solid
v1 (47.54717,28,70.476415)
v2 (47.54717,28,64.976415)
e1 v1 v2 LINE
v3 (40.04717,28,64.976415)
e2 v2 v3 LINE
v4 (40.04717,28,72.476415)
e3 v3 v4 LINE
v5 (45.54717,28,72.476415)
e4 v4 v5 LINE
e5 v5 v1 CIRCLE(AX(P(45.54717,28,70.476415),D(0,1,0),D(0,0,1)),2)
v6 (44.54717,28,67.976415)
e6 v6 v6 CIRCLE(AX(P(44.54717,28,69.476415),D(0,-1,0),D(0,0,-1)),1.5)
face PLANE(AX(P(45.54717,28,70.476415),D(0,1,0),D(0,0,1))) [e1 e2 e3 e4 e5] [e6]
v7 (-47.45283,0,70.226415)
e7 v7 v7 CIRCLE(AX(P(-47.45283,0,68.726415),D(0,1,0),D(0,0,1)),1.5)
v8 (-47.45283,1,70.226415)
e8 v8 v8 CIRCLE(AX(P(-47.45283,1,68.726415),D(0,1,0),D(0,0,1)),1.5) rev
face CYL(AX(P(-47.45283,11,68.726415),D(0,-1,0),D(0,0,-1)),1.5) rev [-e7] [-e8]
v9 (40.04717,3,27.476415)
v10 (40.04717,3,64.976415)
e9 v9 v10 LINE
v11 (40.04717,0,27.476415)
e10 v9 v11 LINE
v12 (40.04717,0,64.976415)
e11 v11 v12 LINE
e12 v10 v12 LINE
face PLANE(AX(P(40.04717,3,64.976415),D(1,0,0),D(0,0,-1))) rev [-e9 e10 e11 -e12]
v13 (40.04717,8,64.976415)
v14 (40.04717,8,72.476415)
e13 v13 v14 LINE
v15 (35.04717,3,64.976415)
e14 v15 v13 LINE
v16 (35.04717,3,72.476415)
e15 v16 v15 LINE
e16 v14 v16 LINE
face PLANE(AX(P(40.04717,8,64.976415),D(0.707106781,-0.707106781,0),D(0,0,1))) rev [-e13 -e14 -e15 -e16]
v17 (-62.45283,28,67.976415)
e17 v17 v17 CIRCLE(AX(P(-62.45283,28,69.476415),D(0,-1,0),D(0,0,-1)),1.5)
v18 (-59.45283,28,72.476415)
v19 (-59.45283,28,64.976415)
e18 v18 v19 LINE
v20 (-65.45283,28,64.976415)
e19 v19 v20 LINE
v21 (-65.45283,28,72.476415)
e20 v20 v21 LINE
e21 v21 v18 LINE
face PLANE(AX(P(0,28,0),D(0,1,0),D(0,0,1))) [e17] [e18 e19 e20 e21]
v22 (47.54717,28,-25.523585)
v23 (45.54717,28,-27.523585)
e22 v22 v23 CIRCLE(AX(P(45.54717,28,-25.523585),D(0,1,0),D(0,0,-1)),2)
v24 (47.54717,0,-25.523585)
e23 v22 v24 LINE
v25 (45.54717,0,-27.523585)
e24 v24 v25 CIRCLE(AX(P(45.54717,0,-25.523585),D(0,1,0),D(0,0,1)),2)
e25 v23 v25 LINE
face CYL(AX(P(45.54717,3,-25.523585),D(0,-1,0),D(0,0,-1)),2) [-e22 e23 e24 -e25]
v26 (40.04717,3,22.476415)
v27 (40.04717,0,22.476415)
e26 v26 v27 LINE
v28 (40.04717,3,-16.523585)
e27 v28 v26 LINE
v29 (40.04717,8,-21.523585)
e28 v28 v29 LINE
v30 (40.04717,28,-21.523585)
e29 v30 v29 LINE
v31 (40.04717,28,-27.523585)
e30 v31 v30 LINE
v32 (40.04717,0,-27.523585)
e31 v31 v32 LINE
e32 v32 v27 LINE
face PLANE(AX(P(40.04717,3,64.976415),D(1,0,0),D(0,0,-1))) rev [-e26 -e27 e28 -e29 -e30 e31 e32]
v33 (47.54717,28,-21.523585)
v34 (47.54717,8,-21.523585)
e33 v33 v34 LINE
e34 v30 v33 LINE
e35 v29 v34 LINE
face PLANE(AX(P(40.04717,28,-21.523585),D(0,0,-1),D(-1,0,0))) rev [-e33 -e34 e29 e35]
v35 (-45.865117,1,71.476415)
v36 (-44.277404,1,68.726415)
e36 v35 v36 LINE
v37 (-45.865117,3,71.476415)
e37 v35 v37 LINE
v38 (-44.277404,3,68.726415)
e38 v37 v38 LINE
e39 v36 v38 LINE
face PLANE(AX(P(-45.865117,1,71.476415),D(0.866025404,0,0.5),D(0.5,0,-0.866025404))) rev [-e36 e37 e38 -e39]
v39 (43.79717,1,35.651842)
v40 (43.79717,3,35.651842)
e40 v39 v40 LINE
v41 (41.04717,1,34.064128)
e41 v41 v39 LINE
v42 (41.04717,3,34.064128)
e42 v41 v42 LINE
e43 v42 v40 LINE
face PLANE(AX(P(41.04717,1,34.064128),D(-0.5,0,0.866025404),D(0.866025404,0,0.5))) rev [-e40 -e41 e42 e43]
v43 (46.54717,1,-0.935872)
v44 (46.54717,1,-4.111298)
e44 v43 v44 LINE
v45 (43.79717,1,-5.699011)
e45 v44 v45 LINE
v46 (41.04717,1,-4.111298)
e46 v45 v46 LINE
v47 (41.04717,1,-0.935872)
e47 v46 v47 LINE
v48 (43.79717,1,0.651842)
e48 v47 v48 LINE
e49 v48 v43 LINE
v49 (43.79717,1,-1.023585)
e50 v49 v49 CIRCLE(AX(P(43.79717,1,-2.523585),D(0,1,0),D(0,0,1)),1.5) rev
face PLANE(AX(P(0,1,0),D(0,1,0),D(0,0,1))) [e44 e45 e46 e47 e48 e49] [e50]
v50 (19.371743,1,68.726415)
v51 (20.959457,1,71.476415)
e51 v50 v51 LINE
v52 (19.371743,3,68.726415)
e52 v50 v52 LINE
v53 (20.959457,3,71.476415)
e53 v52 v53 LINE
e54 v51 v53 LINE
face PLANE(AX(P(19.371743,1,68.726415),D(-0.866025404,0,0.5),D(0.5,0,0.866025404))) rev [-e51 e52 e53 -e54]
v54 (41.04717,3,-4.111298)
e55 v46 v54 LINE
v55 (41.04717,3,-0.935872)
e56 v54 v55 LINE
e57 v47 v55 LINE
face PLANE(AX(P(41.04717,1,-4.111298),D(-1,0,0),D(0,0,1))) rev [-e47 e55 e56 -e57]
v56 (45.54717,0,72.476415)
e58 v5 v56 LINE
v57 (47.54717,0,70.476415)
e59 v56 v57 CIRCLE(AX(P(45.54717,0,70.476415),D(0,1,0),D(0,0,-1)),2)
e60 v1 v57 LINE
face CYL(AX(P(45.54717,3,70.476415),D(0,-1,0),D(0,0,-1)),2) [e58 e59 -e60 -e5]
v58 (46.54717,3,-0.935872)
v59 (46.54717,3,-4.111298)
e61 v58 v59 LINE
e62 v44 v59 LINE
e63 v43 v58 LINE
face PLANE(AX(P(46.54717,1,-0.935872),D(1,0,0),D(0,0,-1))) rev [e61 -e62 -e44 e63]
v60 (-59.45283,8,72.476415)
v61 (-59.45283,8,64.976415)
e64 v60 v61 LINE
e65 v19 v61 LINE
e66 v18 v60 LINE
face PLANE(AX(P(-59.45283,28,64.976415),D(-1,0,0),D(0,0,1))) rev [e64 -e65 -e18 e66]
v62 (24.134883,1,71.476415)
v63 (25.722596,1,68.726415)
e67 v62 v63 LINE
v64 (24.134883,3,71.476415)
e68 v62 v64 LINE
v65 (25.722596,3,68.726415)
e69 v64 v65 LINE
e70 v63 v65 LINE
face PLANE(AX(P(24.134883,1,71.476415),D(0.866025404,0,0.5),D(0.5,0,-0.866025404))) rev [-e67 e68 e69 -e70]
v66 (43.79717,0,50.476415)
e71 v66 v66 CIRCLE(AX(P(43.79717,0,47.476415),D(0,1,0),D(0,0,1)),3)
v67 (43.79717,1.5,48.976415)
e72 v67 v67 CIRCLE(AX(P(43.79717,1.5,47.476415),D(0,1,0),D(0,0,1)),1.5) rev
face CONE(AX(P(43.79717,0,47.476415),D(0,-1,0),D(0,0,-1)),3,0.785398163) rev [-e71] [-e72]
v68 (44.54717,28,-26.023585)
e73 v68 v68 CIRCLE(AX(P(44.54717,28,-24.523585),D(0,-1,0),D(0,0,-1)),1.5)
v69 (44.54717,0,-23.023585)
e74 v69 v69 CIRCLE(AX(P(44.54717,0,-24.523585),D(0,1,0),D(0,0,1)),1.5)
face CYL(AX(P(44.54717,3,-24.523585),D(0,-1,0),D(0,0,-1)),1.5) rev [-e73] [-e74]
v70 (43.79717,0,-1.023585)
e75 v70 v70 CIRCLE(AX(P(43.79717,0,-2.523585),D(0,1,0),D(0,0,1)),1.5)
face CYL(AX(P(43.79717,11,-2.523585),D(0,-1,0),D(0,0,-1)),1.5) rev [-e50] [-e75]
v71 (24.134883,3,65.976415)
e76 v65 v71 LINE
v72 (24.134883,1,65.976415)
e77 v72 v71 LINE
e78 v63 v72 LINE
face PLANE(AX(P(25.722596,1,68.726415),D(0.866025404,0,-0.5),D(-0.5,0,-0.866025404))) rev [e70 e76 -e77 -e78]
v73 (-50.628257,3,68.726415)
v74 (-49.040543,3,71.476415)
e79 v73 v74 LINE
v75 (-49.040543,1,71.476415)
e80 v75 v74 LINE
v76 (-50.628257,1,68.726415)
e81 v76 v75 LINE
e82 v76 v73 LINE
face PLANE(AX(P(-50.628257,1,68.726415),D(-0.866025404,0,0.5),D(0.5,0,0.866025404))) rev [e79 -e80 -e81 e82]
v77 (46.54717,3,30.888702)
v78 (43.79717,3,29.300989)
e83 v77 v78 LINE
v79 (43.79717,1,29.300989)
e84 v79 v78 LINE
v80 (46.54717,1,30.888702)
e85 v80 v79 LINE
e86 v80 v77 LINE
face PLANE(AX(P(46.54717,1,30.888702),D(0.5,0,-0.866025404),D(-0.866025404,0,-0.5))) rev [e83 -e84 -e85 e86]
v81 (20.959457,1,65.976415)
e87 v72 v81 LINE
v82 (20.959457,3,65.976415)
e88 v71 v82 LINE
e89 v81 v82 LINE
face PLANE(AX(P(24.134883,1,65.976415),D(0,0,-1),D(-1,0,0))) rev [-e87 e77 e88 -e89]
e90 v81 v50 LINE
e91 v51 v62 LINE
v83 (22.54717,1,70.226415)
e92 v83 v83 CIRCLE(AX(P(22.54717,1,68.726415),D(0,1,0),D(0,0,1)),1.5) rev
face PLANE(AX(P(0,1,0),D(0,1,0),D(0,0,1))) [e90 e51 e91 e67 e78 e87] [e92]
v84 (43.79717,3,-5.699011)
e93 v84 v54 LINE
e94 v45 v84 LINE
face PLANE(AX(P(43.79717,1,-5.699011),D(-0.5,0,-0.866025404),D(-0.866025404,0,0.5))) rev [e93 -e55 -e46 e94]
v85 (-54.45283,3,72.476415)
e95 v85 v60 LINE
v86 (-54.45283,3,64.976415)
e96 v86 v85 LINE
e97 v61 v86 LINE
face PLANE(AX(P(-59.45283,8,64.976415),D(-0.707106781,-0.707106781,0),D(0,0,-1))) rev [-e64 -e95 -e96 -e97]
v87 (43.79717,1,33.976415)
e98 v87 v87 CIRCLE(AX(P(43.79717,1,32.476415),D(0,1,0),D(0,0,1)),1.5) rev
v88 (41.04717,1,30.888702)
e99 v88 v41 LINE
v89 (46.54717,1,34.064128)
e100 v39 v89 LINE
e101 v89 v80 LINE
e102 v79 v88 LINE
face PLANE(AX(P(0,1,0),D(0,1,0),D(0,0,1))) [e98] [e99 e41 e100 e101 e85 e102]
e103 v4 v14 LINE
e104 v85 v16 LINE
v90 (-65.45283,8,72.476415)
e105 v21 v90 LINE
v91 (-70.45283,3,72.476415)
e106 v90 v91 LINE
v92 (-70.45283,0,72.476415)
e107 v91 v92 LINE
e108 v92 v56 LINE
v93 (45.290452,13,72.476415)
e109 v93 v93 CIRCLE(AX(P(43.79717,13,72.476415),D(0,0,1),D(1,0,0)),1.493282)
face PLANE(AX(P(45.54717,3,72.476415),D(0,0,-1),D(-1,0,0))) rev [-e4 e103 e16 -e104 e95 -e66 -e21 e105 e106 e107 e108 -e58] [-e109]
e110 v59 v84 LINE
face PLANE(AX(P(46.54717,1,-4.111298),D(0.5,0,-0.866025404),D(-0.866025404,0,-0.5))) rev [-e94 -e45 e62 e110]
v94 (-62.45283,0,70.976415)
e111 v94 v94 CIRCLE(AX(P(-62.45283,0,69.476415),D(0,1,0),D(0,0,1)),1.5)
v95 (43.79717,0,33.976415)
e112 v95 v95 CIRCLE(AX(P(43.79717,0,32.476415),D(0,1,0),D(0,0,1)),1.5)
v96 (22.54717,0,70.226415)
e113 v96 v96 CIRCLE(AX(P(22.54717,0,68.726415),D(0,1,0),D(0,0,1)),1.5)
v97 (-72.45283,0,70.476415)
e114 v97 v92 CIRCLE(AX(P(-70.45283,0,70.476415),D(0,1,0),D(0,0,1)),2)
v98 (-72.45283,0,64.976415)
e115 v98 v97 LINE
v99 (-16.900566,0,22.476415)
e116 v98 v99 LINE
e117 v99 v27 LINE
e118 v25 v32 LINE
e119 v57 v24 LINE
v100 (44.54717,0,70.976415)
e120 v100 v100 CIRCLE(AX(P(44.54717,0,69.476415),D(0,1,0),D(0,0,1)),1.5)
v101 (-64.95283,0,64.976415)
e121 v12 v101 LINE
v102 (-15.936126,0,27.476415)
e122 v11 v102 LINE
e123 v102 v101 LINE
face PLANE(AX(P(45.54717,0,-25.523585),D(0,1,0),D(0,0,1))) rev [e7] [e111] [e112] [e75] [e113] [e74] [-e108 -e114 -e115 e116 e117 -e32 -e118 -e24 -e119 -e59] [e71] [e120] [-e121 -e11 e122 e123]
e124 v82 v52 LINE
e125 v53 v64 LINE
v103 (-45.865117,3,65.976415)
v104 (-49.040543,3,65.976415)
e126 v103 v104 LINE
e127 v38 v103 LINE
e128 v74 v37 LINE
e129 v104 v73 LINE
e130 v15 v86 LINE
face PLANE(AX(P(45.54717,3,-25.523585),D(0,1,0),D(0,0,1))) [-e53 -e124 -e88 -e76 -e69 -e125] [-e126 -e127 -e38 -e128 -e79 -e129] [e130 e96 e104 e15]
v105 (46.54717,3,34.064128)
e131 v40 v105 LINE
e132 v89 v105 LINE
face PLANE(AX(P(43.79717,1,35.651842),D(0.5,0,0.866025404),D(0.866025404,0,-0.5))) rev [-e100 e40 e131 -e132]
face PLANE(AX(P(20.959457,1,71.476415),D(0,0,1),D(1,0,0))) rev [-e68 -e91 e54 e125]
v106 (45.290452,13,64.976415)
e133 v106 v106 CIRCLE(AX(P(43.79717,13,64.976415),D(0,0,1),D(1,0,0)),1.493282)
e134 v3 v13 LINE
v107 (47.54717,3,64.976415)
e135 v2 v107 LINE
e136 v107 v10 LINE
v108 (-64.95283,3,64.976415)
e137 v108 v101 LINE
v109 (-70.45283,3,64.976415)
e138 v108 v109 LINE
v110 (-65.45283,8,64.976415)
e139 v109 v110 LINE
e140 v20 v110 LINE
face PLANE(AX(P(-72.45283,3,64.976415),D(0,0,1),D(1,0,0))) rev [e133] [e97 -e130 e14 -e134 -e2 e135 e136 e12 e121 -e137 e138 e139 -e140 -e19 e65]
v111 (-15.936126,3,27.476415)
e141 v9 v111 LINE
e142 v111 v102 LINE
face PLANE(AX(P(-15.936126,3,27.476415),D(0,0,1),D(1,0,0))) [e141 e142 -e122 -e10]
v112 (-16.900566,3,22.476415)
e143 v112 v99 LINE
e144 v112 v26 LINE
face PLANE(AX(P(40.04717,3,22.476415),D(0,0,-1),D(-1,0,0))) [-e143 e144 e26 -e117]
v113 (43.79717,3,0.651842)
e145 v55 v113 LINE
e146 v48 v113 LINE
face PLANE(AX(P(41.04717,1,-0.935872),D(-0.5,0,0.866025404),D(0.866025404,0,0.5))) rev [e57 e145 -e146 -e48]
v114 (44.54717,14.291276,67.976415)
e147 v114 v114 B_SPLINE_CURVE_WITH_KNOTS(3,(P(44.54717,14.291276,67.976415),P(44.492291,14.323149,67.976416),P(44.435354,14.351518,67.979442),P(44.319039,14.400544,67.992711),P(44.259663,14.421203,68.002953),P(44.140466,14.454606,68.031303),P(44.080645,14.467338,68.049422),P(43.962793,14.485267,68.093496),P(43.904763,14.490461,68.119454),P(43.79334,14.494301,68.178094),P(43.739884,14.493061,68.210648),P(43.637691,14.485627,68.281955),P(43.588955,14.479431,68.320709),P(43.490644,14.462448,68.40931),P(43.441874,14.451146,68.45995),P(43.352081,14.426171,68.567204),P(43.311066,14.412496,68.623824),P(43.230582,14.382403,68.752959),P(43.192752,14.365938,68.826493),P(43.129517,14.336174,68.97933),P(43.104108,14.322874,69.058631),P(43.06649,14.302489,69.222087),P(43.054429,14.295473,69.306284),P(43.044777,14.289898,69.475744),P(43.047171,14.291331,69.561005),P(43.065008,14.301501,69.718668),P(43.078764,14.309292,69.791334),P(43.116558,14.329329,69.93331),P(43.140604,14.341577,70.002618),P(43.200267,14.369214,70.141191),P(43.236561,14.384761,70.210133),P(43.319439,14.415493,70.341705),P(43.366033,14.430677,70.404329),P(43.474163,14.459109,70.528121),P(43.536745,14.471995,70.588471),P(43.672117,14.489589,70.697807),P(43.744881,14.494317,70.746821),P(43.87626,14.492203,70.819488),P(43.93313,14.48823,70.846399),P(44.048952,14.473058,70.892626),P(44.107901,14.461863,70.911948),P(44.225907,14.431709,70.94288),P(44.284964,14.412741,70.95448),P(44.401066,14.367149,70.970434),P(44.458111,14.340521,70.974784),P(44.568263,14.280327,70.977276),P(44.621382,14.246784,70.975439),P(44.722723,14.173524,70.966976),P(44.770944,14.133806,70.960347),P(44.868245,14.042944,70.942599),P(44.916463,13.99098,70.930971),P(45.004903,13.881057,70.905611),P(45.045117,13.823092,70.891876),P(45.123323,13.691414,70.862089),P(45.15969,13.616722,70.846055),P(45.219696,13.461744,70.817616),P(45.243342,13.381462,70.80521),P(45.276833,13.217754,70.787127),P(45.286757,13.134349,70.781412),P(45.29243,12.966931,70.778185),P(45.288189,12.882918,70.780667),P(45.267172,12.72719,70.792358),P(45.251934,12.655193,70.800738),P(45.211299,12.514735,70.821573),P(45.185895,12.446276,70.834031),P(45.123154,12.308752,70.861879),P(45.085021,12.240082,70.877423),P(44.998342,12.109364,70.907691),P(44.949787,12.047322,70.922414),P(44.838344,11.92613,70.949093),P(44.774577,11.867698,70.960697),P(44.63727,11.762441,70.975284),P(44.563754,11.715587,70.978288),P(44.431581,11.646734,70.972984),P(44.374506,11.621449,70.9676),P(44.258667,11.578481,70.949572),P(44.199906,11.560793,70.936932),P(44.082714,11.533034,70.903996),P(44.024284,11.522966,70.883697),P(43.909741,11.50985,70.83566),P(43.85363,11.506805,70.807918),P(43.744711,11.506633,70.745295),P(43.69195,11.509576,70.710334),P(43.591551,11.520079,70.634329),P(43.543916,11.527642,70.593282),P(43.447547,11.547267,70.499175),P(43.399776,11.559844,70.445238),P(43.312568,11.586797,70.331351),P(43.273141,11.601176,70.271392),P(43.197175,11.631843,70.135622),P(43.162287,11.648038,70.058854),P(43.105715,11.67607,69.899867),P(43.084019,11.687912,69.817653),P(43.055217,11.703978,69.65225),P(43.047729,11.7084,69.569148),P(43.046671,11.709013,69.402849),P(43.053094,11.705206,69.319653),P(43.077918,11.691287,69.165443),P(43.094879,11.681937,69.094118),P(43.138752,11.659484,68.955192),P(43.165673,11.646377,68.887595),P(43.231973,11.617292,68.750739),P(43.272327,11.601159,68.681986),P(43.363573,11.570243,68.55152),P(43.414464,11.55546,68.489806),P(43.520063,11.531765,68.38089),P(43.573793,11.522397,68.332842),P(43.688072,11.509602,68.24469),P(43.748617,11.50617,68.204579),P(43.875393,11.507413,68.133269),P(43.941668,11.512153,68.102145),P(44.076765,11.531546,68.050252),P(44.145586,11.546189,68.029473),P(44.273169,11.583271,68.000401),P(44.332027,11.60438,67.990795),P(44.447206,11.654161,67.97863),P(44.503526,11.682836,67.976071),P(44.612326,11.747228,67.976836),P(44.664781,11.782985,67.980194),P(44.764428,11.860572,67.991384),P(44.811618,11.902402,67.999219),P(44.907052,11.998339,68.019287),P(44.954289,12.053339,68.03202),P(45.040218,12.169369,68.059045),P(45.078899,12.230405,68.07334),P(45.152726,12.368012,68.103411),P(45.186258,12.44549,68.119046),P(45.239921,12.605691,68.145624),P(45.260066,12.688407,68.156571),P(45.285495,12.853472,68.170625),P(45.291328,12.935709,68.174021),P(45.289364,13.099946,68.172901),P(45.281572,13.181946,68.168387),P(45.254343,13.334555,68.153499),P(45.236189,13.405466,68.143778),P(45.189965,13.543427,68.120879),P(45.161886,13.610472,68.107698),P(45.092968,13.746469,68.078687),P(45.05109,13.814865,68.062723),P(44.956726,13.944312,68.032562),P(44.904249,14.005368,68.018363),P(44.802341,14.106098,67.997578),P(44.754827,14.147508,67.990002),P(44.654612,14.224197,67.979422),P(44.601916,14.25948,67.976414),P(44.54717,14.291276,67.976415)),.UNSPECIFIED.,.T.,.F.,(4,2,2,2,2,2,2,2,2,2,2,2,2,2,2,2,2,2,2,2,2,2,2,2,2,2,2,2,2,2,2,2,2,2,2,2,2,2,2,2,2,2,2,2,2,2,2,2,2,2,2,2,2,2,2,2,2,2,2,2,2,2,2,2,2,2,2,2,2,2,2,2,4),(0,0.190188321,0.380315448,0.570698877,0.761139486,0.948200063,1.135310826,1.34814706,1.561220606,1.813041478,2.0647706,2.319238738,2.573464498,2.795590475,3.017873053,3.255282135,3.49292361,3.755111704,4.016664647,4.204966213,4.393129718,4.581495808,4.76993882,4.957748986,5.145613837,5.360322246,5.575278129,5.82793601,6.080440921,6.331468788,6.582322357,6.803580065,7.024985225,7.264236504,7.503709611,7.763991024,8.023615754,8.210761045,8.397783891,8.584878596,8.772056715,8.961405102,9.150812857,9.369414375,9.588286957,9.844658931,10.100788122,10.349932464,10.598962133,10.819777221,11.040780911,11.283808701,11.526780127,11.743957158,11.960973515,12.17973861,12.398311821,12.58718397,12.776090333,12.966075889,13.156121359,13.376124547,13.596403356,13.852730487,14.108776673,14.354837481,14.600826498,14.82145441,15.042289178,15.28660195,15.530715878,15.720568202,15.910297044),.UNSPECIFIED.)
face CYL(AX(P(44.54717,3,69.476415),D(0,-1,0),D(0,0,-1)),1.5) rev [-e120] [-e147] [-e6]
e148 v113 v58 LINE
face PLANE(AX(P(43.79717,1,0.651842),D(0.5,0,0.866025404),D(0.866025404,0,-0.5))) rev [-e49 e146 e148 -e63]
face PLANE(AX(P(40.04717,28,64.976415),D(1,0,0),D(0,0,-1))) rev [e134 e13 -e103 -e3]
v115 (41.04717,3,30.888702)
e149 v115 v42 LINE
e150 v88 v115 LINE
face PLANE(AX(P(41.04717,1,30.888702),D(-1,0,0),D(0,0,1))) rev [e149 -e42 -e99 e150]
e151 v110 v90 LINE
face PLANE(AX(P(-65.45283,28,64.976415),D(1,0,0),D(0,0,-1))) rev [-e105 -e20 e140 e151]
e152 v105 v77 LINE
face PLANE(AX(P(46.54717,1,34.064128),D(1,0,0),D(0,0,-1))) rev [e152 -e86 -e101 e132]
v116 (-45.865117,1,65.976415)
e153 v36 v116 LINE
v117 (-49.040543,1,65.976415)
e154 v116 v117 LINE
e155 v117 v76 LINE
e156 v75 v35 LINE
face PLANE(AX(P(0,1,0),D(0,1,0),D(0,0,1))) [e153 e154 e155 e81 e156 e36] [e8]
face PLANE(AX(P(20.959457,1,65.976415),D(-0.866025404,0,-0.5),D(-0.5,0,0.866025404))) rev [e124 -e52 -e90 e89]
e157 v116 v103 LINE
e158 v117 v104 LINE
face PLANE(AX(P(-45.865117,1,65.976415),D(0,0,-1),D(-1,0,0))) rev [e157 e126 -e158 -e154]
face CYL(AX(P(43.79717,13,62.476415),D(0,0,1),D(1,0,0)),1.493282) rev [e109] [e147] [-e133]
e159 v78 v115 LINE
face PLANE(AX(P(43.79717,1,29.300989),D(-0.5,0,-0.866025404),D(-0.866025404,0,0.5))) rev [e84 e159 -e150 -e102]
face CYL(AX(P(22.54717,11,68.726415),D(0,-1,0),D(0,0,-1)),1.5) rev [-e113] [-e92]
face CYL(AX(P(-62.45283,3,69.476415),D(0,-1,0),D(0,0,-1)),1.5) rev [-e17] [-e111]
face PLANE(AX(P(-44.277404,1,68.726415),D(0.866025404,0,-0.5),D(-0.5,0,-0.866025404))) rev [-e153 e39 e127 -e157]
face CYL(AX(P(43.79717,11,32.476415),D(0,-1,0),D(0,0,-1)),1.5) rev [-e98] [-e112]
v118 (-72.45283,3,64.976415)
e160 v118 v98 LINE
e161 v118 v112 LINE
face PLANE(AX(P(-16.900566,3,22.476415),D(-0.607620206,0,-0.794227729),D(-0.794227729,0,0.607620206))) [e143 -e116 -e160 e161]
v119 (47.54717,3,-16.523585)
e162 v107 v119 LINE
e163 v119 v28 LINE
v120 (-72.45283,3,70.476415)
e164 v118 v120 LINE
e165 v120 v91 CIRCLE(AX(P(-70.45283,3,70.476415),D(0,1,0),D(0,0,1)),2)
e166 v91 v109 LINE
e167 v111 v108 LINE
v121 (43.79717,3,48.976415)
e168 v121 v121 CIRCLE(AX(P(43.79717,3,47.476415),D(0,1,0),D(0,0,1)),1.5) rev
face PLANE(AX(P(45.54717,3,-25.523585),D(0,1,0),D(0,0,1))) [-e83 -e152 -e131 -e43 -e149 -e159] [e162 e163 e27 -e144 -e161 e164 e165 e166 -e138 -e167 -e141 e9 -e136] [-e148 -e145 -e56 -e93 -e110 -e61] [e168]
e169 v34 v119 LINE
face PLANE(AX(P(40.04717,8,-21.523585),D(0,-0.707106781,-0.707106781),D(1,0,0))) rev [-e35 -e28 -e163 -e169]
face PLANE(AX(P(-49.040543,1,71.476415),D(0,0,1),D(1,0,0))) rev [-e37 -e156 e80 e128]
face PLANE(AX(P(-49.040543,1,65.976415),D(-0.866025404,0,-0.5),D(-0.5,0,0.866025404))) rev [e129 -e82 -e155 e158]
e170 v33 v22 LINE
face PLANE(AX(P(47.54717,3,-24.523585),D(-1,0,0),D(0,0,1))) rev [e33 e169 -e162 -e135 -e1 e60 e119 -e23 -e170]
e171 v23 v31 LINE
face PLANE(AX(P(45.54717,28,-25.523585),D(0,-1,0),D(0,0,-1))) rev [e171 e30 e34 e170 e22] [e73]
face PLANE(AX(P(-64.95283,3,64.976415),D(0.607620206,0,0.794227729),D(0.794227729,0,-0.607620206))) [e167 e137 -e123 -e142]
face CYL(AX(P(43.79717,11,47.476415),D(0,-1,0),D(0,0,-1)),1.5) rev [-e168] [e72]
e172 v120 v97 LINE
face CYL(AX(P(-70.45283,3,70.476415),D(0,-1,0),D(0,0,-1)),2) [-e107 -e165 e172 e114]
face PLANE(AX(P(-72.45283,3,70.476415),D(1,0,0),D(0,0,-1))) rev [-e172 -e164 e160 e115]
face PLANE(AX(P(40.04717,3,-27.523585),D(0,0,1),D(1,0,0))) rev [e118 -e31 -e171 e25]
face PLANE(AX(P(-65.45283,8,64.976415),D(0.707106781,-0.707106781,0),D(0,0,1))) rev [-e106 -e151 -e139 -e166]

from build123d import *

# Parameters (mm, degrees)
SKETCH1_R               = 1.5
BOSS_EXTRUDE1_DEPTH     = 3
SKETCH2_W               = 6
SKETCH2_H               = 7.5
BOSS_EXTRUDE2_DEPTH     = 25
CHAMFER3_SIZE           = 5
CHAMFER6_SIZE           = 5
CHAMFER8_SIZE           = 5
SKETCH3_R               = 1.5
CUT_EXTRUDE1_DEPTH      = 107.236732571
BOSS_EXTRUDE3_DEPTH     = 3
CUT_EXTRUDE2_DEPTH      = 2
CUT_EXTRUDE3_DEPTH      = 10
CUT_EXTRUDE3_DEPTH_BACK = 106.977560584
SKETCH6_R               = 1.5
SKETCH9_R               = 1.493282486
CUT_EXTRUDE4_DEPTH      = 10
CHAMFER9_SIZE           = 1.5


with BuildPart() as part:
    # Sketch1 → Boss-Extrude1 (new body)
    with BuildSketch(Plane(origin=(0, 0, 0), x_dir=(1, 0, 0), z_dir=(0, 1, 0))):
        with BuildLine():
            Line((40.047169811, 27.523584906), (44.547169811, 27.523584906))
            Line((44.547169811, 27.523584906), (45.547169811, 27.523584906))
            ThreePointArc((45.547169811, 27.523584906), (46.961383374, 26.937798468), (47.547169811, 25.523584906))
            Line((47.547169811, 25.523584906), (47.547169811, 24.523584906))
            Line((47.547169811, 24.523584906), (47.547169811, -70.476415094))
            ThreePointArc((47.547169811, -70.476415094), (46.961383374, -71.890628657), (45.547169811, -72.476415094))
            Line((45.547169811, -72.476415094), (-69.452830189, -72.476415094))
            Line((-69.452830189, -72.476415094), (-70.452830189, -72.476415094))
            ThreePointArc((-70.452830189, -72.476415094), (-71.867043751, -71.890628657), (-72.452830189, -70.476415094))
            Line((-72.452830189, -70.476415094), (-72.452830189, -69.476415094))
            Line((-72.452830189, -69.476415094), (-72.452830189, -64.976415094))
            Line((-72.452830189, -64.976415094), (40.047169811, -64.976415094))
            Line((40.047169811, -64.976415094), (40.047169811, 27.523584906))
        make_face()
        with Locations(Location((44.547169811, 24.523584906, 0), (0, 0, 270))):
            Circle(SKETCH1_R, mode=Mode.SUBTRACT)
        with Locations(Location((44.547169811, -69.476415094, 0), (0, 0, 270))):
            Circle(SKETCH1_R, mode=Mode.SUBTRACT)
        with Locations(Location((-62.452830189, -69.476415094, 0), (0, 0, 270))):
            Circle(SKETCH1_R, mode=Mode.SUBTRACT)
    extrude(amount=BOSS_EXTRUDE1_DEPTH)

    # Sketch2 → Boss-Extrude2 (add)
    with BuildSketch(Plane(origin=(0, 3, 0), x_dir=(1, 0, 0), z_dir=(0, 1, 0))):
        with BuildLine():
            Line((40.047169811, -64.976415094), (47.547169811, -64.976415094))
            Line((47.547169811, -64.976415094), (47.547169811, -70.476415094))
            ThreePointArc((47.547169811, -70.476415094), (46.961383374, -71.890628657), (45.547169811, -72.476415094))
            Line((45.547169811, -72.476415094), (40.047169811, -72.476415094))
            Line((40.047169811, -72.476415094), (40.047169811, -64.976415094))
        make_face()
        with Locations((-62.452830189, -68.726415094)):
            Rectangle(SKETCH2_W, SKETCH2_H)
        with BuildLine():
            Line((40.047169811, 21.523584906), (47.547169811, 21.523584906))
            Line((47.547169811, 21.523584906), (47.547169811, 25.523584906))
            ThreePointArc((47.547169811, 25.523584906), (46.961383374, 26.937798468), (45.547169811, 27.523584906))
            Line((45.547169811, 27.523584906), (40.047169811, 27.523584906))
            Line((40.047169811, 27.523584906), (40.047169811, 21.523584906))
        make_face()
    extrude(amount=BOSS_EXTRUDE2_DEPTH)

    # Chamfer3
    chamfer3_edges = [part.edges().sort_by_distance(p)[0] for p in [
        (43.797169811, 3, -21.523584906),
    ]]
    chamfer(chamfer3_edges, length=CHAMFER3_SIZE)

    # Chamfer6
    # the kernel refuses this chamfer: 5 mm, written as the material it adds along each edge
    with BuildSketch(Plane(origin=(40.047169811, 3, 72.476415094), x_dir=(0.027495876610586317, 0.9996219169112968, 0), z_dir=(0, 0, -1))) as chamfer6_piece_1:
        Polygon((CHAMFER6_SIZE * 0.999621916911, -CHAMFER6_SIZE * 0.0274958766106), (-CHAMFER6_SIZE * 0.0274958766106, -CHAMFER6_SIZE * 0.999621916911), (0, 0), align=None)
    extrude(amount=7.5)

    # Chamfer8
    chamfer8_edges = [part.edges().sort_by_distance(p)[0] for p in [
        (-65.452830189, 3, 68.726415094),
        (-59.452830189, 3, 68.726415094),
    ]]
    chamfer(chamfer8_edges, length=CHAMFER8_SIZE)

    # Sketch3 → Cut-Extrude1 (cut, through all)
    with BuildSketch(Plane(origin=(0, 0, 0), x_dir=(-1, 0, 0), z_dir=(0, -1, 0))):
        with Locations(Location((62.452830189, -69.476415094, 0), (0, 0, 90))):
            Circle(SKETCH3_R)
        with Locations(Location((-44.547169811, -69.476415094, 0), (0, 0, 90))):
            Circle(SKETCH3_R)
        with Locations(Location((-44.547169811, 24.523584906, 0), (0, 0, 90))):
            Circle(SKETCH3_R)
    extrude(amount=-CUT_EXTRUDE1_DEPTH, mode=Mode.SUBTRACT)

    # Sketch4 → Boss-Extrude3 (add)
    with BuildSketch(Plane(origin=(0, 0, 0), x_dir=(-1, 0, 0), z_dir=(0, -1, 0))):
        Polygon((-40.047169811, -22.476415094), (16.900565623, -22.476415094), (72.452830189, -64.976415094), (64.952830189, -64.976415094), (15.93612616, -27.476415094), (-40.047169811, -27.476415094), align=None)
    extrude(amount=-BOSS_EXTRUDE3_DEPTH)

    # Sketch5 → Cut-Extrude2 (cut)
    with BuildSketch(Plane(origin=(0, 3, 0), x_dir=(1, 0, 0), z_dir=(0, 1, 0))):
        Polygon((-44.277403708, -68.726415094), (-45.865116948, -65.976415094), (-49.040543429, -65.976415094), (-50.628256669, -68.726415094), (-49.040543429, -71.476415094), (-45.865116948, -71.476415094), align=None)
        Polygon((25.722596292, -68.726415094), (24.134883052, -65.976415094), (20.959456571, -65.976415094), (19.371743331, -68.726415094), (20.959456571, -71.476415094), (24.134883052, -71.476415094), align=None)
        Polygon((43.797169811, -0.651841575), (46.547169811, 0.935871665), (46.547169811, 4.111298146), (43.797169811, 5.699011386), (41.047169811, 4.111298146), (41.047169811, 0.935871665), align=None)
        Polygon((43.797169811, -35.651841575), (46.547169811, -34.064128335), (46.547169811, -30.888701854), (43.797169811, -29.300988614), (41.047169811, -30.888701854), (41.047169811, -34.064128335), align=None)
    extrude(amount=-CUT_EXTRUDE2_DEPTH, mode=Mode.SUBTRACT)

    # Sketch6 → Cut-Extrude3 (cut, two sides: drawn at the far end of the back side and taken through both)
    with BuildSketch(Plane(origin=(0, 1, 0), x_dir=(1, 0, 0), z_dir=(0, 1, 0)).offset(-CUT_EXTRUDE3_DEPTH_BACK)):
        with Locations(Location((43.797169811, 2.523584906, 0), (0, 0, 270))):
            Circle(SKETCH6_R)
        with Locations(Location((43.797169811, -32.476415094, 0), (0, 0, 270))):
            Circle(SKETCH6_R)
        with Locations(Location((22.547169811, -68.726415094, 0), (0, 0, 270))):
            Circle(SKETCH6_R)
        with Locations(Location((-47.452830189, -68.726415094, 0), (0, 0, 270))):
            Circle(SKETCH6_R)
        with Locations(Location((43.797169811, -47.476415094, 0), (0, 0, 270))):
            Circle(SKETCH6_R)
    extrude(amount=CUT_EXTRUDE3_DEPTH + CUT_EXTRUDE3_DEPTH_BACK, mode=Mode.SUBTRACT)

    # Sketch9 → Cut-Extrude4 (cut)
    with BuildSketch(Plane.XY.offset(72.476415094)):
        with Locations((43.797169811, 13)):
            Circle(SKETCH9_R)
    extrude(amount=-CUT_EXTRUDE4_DEPTH, mode=Mode.SUBTRACT)

    # Chamfer9
    chamfer9_edges = [part.edges().sort_by_distance(p)[0] for p in [
        (43.797169811, 0, 45.976415094),
    ]]
    chamfer(chamfer9_edges, length=CHAMFER9_SIZE)


solid = part.part
